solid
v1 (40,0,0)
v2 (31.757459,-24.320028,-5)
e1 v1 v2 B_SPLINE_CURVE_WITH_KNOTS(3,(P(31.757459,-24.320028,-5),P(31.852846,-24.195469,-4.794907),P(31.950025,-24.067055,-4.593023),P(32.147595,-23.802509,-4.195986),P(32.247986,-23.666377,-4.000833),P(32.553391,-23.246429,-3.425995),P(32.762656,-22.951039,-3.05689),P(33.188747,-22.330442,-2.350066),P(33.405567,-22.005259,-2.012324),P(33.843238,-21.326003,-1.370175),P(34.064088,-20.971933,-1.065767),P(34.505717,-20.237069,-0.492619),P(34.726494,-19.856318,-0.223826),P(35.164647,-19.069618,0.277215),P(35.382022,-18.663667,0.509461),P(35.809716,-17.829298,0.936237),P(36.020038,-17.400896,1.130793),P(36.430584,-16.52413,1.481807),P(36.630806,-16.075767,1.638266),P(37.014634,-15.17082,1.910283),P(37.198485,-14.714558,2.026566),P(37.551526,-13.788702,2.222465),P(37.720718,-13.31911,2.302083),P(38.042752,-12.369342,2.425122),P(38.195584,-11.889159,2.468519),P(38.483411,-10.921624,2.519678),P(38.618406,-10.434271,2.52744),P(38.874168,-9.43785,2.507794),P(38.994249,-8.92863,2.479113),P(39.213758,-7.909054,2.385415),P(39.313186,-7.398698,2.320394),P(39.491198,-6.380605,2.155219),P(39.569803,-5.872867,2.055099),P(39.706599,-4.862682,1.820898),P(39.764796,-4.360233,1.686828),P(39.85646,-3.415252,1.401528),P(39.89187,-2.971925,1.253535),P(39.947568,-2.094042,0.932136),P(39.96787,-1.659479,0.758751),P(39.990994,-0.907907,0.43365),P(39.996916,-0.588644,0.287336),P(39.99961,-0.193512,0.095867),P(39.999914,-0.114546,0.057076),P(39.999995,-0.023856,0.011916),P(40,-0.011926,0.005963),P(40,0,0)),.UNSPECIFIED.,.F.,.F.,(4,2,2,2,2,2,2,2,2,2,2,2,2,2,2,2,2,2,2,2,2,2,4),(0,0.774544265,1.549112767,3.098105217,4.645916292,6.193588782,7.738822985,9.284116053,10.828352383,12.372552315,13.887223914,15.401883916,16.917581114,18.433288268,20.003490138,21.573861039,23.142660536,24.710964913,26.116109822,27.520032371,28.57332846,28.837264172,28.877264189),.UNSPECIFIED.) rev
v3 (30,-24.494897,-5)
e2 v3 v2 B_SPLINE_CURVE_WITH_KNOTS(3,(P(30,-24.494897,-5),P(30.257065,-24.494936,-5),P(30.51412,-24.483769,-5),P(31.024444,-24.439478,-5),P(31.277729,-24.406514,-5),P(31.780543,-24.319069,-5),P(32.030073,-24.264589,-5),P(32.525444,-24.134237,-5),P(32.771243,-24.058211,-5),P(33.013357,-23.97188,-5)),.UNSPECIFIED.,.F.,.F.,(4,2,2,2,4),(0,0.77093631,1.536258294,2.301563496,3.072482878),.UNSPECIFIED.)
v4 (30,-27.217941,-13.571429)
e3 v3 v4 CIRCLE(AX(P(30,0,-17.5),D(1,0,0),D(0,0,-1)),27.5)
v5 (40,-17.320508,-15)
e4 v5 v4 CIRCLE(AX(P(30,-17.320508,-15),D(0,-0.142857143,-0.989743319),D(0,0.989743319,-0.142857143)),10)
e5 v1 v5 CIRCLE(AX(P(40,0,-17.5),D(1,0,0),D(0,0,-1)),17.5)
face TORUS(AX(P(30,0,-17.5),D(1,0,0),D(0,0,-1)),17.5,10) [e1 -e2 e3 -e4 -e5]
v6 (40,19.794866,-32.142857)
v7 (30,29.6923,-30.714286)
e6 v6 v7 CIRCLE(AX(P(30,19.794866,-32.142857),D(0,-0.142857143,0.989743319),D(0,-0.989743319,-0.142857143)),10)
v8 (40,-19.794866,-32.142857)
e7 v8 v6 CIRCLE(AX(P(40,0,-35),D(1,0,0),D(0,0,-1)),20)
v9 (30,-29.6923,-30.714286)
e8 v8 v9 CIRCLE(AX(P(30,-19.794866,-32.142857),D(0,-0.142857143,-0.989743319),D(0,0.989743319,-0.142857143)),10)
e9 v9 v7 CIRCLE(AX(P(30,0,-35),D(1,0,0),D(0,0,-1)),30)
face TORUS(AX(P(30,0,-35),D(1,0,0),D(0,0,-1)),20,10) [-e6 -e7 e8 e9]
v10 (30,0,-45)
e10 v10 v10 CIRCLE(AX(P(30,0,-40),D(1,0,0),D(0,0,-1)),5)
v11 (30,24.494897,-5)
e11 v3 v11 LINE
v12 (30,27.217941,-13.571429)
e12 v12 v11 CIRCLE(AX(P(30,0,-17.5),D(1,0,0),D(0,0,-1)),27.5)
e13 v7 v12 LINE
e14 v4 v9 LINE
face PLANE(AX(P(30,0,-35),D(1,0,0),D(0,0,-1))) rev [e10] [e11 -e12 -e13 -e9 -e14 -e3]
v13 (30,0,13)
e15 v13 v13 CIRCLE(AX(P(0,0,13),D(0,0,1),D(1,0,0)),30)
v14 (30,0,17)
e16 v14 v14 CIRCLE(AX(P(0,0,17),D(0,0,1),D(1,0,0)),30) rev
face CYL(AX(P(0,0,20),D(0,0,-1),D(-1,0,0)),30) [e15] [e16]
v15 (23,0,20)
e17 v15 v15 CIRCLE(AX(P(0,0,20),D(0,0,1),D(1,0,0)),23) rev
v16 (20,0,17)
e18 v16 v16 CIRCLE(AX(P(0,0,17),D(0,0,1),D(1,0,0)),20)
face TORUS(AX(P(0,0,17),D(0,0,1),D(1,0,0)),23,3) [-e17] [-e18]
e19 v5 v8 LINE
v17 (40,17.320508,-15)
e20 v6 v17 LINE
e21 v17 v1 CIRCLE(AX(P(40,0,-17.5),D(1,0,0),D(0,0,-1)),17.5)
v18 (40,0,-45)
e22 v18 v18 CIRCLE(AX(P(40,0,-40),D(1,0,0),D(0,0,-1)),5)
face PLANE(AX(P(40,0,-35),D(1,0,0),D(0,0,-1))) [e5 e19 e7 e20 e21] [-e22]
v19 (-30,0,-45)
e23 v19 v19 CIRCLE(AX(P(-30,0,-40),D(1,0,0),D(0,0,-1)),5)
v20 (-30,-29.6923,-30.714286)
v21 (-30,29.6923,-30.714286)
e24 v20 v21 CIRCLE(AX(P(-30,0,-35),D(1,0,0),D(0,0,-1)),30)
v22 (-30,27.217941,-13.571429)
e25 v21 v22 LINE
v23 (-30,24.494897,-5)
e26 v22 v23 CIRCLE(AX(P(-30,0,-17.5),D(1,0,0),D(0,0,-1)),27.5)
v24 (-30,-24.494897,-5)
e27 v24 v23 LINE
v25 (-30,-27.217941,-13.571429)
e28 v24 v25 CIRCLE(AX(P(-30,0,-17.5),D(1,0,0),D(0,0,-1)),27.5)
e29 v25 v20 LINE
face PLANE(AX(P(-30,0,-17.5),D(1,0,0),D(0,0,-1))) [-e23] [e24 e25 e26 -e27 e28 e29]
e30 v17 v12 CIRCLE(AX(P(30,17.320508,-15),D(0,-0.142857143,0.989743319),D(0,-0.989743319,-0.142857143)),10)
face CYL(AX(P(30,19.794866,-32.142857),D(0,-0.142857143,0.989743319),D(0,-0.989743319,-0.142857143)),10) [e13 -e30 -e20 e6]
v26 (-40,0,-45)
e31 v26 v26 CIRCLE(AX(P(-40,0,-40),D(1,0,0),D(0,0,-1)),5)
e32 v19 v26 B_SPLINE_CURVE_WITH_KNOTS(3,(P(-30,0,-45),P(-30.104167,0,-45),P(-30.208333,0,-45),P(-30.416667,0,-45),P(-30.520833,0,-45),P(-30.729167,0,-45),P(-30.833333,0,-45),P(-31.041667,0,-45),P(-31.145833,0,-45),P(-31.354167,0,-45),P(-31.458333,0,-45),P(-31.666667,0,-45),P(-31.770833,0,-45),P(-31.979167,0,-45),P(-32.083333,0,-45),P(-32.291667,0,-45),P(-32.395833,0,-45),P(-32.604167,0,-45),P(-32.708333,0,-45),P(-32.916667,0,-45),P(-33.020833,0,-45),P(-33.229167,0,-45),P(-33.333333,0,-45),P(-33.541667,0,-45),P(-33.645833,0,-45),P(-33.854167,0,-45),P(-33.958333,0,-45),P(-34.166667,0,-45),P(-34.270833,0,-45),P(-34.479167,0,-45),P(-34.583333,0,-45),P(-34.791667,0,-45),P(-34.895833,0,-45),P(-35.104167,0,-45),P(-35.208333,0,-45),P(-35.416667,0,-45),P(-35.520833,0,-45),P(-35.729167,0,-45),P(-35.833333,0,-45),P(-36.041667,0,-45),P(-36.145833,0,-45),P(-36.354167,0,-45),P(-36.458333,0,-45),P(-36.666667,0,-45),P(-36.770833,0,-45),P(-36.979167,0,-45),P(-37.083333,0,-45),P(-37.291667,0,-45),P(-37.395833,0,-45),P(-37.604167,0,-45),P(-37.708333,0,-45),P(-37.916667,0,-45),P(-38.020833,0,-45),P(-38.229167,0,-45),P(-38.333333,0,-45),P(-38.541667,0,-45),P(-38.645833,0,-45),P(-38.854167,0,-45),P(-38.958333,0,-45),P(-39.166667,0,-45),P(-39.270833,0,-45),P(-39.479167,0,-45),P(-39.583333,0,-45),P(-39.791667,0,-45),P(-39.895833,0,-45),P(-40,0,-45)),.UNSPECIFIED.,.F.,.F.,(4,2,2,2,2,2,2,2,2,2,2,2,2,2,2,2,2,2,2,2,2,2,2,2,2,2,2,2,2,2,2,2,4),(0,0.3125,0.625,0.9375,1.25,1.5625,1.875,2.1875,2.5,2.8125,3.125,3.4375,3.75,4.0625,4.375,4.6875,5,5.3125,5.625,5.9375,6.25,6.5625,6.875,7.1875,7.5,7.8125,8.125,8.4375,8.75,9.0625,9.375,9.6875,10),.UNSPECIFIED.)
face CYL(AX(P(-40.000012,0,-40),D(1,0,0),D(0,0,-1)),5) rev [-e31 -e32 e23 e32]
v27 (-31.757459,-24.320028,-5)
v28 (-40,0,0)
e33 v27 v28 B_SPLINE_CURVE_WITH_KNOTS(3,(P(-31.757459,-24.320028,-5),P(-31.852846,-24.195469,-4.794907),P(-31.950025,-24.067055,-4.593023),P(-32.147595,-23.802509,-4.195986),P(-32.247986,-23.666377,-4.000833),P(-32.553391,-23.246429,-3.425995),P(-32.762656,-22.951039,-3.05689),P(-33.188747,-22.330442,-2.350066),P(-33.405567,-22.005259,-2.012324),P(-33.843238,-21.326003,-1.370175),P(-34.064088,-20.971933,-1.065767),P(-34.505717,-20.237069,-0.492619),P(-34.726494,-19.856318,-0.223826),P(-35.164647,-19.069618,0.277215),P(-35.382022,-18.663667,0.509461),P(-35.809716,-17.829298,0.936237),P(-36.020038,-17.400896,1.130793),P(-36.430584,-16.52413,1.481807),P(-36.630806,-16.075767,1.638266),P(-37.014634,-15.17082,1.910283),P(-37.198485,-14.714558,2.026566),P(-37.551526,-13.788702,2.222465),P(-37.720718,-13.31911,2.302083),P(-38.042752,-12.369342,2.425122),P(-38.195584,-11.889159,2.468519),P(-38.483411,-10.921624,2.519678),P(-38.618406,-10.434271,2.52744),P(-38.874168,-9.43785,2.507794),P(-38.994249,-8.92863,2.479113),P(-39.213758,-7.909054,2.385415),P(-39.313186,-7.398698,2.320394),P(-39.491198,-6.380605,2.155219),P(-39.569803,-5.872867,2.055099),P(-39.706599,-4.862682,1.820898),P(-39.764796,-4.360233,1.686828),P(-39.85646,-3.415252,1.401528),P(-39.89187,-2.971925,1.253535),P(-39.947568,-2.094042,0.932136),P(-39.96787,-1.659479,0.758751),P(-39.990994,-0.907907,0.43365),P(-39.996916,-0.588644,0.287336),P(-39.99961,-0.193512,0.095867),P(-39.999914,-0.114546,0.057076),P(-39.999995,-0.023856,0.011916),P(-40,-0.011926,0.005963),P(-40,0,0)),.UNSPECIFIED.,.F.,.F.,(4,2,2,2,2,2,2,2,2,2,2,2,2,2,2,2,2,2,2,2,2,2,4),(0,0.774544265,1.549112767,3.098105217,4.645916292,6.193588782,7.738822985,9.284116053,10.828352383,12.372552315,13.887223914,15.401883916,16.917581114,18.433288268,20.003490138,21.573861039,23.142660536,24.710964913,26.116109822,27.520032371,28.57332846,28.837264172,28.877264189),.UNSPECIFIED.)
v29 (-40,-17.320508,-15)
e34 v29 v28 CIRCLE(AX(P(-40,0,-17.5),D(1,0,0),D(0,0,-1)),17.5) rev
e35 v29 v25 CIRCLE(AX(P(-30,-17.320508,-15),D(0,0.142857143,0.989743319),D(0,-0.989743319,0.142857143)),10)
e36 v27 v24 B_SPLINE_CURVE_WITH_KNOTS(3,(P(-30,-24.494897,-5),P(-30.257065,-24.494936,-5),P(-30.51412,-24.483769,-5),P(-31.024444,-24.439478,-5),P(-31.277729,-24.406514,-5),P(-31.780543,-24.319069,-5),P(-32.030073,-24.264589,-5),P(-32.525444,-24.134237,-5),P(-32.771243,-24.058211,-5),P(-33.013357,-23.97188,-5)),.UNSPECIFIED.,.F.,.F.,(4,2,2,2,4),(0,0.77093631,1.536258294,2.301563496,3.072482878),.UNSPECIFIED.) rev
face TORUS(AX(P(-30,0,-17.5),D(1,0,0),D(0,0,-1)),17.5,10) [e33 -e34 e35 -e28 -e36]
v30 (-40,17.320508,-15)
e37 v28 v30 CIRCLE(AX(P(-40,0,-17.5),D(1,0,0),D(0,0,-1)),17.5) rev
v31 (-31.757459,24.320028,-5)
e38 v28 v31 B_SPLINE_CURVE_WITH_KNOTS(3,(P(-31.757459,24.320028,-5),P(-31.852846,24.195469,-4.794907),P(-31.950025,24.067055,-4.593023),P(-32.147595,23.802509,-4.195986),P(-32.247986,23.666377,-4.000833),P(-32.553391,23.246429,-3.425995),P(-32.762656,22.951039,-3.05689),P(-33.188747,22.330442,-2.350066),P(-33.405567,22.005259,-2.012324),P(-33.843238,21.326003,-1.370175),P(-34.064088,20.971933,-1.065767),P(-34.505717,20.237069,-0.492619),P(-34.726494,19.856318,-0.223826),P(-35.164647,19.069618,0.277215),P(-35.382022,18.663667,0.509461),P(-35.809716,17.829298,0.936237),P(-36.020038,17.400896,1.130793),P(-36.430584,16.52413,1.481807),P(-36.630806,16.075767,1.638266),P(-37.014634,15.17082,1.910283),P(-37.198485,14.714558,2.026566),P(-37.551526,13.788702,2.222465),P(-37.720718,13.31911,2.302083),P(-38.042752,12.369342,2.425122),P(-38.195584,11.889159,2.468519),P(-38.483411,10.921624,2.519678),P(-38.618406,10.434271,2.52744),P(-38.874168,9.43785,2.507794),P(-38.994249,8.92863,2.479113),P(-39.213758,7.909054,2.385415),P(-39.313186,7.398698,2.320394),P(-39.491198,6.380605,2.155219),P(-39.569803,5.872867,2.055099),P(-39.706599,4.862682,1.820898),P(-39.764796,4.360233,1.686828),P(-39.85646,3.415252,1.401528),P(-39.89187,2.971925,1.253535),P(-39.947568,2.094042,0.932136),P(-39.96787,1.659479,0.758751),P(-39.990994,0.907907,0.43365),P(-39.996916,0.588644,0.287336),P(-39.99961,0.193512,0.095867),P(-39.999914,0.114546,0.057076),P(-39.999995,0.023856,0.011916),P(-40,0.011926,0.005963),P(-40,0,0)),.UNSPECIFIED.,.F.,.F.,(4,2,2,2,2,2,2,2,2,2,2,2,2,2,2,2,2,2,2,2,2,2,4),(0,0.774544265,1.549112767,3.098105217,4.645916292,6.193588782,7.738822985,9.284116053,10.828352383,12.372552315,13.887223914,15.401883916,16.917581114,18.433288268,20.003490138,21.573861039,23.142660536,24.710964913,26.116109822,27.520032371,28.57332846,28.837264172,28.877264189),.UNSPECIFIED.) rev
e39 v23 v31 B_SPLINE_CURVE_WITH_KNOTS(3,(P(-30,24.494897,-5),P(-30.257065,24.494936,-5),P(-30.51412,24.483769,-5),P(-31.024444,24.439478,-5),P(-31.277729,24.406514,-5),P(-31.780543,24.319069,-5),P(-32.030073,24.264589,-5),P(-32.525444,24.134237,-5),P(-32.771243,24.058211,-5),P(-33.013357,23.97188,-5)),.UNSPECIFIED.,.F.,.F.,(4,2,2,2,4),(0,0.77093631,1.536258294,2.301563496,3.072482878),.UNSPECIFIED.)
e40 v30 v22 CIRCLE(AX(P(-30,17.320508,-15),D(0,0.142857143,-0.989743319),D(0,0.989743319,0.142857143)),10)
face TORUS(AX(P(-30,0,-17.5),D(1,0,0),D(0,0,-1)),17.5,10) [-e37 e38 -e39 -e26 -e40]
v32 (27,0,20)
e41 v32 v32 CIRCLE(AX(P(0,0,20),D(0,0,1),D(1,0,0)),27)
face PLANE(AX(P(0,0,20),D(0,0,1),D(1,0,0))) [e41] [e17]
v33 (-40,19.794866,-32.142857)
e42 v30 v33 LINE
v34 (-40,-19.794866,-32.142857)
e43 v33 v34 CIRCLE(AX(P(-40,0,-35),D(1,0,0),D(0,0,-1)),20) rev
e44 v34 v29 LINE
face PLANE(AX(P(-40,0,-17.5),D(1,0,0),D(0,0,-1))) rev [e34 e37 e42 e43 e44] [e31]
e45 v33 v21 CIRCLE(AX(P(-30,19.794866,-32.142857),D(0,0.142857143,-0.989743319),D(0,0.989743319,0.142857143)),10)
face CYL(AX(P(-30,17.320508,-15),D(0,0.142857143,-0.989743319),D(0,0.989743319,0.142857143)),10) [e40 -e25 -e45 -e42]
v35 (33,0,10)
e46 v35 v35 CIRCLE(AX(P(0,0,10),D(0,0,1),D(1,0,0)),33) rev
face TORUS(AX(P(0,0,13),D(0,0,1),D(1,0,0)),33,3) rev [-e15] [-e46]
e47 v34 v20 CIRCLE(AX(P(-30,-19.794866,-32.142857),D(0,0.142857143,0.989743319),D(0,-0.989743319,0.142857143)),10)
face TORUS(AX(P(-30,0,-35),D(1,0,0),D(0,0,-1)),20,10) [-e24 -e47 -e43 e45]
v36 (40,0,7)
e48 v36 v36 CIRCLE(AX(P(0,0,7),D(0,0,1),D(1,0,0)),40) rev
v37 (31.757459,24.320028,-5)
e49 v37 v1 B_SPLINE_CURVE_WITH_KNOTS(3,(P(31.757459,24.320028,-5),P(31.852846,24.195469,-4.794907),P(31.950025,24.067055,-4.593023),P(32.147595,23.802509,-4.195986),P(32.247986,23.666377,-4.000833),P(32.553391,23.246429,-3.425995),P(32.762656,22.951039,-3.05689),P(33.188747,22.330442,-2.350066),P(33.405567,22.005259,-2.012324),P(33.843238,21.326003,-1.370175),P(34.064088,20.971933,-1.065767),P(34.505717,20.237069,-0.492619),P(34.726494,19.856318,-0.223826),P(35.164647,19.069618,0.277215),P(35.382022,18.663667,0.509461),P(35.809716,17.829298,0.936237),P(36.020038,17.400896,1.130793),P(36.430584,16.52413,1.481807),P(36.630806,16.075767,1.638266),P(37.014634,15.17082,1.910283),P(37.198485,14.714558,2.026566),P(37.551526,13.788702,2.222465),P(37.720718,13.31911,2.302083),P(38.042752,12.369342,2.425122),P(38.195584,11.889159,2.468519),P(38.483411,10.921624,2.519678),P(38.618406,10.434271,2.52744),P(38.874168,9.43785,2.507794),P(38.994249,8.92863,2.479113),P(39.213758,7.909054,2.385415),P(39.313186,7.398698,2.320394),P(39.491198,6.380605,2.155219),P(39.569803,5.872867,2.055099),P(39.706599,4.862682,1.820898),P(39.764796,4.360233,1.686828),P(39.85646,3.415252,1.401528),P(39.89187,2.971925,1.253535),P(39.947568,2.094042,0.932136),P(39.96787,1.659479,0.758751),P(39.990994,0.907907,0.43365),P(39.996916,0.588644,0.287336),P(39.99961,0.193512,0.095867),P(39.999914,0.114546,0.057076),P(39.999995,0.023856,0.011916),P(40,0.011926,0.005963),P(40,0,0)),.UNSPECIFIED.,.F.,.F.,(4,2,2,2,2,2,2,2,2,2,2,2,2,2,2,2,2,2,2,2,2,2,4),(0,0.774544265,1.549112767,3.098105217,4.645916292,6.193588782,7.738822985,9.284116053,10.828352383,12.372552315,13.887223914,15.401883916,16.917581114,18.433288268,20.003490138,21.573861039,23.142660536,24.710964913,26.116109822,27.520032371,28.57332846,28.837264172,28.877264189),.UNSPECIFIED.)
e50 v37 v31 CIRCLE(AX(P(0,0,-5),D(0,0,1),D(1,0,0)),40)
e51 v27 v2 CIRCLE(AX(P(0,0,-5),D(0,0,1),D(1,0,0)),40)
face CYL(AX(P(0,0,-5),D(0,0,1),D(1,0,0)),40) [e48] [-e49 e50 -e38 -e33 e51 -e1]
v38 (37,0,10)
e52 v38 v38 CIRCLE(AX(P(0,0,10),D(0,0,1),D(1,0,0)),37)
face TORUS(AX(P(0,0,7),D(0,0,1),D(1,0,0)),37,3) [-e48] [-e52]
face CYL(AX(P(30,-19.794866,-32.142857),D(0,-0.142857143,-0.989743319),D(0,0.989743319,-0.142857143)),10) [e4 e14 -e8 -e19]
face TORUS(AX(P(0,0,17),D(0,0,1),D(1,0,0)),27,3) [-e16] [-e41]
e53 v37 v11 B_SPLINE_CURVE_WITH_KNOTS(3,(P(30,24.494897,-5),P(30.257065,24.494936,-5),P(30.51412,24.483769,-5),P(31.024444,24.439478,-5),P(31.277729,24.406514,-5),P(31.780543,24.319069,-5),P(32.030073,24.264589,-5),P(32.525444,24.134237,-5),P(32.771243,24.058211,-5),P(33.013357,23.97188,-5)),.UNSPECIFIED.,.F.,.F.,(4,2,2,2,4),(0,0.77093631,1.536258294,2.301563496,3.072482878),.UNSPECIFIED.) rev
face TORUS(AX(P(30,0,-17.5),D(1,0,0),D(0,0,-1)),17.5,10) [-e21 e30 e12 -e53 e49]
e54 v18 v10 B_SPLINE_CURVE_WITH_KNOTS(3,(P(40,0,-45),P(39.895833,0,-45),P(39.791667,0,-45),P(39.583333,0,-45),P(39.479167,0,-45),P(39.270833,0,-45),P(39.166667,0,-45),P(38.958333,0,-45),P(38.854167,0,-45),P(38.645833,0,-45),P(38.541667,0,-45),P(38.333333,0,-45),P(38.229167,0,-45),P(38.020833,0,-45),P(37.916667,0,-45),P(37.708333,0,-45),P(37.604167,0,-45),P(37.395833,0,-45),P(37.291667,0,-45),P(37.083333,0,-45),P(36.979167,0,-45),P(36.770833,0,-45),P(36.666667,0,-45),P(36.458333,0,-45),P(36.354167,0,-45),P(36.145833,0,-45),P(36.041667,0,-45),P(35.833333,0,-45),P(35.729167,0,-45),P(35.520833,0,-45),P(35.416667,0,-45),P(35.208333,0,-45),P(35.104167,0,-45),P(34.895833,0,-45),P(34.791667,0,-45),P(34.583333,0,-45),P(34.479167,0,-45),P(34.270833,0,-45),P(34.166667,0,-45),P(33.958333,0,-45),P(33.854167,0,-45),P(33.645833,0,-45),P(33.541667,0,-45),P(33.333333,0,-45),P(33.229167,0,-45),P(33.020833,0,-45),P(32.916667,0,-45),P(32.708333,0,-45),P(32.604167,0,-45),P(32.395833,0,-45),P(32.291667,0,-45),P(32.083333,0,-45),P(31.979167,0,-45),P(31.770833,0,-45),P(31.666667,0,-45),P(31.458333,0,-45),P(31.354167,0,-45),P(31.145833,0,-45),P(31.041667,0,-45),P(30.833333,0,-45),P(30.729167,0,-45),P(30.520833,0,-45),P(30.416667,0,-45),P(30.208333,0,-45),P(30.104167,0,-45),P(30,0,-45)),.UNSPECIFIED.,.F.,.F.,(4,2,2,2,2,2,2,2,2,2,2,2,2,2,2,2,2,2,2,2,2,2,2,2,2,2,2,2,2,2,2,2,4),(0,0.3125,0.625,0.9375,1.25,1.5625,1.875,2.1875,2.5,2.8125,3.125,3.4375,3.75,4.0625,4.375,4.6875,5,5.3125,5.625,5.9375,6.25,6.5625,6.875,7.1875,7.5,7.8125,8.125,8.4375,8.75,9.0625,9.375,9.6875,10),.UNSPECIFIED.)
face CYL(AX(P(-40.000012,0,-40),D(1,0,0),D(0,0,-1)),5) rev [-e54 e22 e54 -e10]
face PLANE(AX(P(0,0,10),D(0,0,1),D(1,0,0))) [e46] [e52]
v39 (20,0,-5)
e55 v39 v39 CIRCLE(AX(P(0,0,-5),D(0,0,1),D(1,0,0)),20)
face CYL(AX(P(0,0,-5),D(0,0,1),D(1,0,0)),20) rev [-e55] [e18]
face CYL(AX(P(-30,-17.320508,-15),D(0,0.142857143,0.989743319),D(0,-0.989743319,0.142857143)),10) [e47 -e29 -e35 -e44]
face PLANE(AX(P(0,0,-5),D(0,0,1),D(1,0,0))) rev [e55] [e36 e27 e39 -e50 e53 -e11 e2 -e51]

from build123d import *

# Parameters (mm, degrees)
EXTRUDE_1_DEPTH          = 10
EXTRUDE_1_DEPTH_BACK     = 5
SKETCH_1_R               = 40
SKETCH_2_R               = 30
EXTRUDE_2_DEPTH          = 10
SKETCH_3_R               = 20
CUT_EXTRUDE_1_DEPTH      = 62.846584384
EXTRUDE_3_DEPTH          = 10
EXTRUDE_START            = 10
EXTRUDE_4_DEPTH          = 10
CUT_EXTRUDE_2_DEPTH      = 111.566722046
CUT_EXTRUDE_2_DEPTH_BACK = 111.566722046
SKETCH_8_R               = 5
FILLET_1_R               = 10
FILLET_2_R               = 10
FILLET_3_R               = 3
FILLET_4_R               = 3


with BuildPart() as part:
    # 스케치1 → 보스-돌출1 (new, two sides: drawn at the far end of the back side and taken through both)
    with BuildSketch(Plane.XY.offset(-EXTRUDE_1_DEPTH_BACK)):
        Circle(SKETCH_1_R)
    extrude(amount=EXTRUDE_1_DEPTH + EXTRUDE_1_DEPTH_BACK)

    # 스케치2 → 보스-돌출2 (add)
    with BuildSketch(Plane.XY.offset(10)):
        Circle(SKETCH_2_R)
    extrude(amount=EXTRUDE_2_DEPTH)

    # 스케치3 → 컷-돌출1 (cut, through all)
    with BuildSketch(Plane.XY.offset(20)):
        Circle(SKETCH_3_R)
    extrude(amount=-CUT_EXTRUDE_1_DEPTH, mode=Mode.SUBTRACT)

    # 스케치6 → 보스-돌출3 (add)
    with BuildSketch(Plane(origin=(40, 0, 0), x_dir=(0, 0, -1), z_dir=(1, 0, 0))):
        with BuildLine():
            Line((13.571428571, 27.217941262), (30.714285714, 29.692299558))
            ThreePointArc((30.714285714, 29.692299558), (65, 0), (30.714285714, -29.692299558))
            Line((30.714285714, -29.692299558), (13.571428571, -27.217941262))
            ThreePointArc((13.571428571, -27.217941262), (-10, 0), (13.571428571, 27.217941262))
        make_face()
    extrude(amount=-EXTRUDE_3_DEPTH)

    # 스케치7 → 보스-돌출4 (add)
    with BuildSketch(Plane(origin=(-40, 0, 0), x_dir=(0, 0, -1), z_dir=(1, 0, 0)).offset(EXTRUDE_START)):
        with BuildLine():
            Line((30.714285714, 29.692299558), (13.571428571, 27.217941262))
            ThreePointArc((13.571428571, 27.217941262), (-10, 0), (13.571428571, -27.217941262))
            Line((13.571428571, -27.217941262), (30.714285714, -29.692299558))
            ThreePointArc((30.714285714, -29.692299558), (65, 0), (30.714285714, 29.692299558))
        make_face()
    extrude(amount=-EXTRUDE_4_DEPTH)

    # 스케치8 → 컷-돌출2 (cut, two sides: drawn at the far end of the back side and taken through both)
    with BuildSketch(Plane(origin=(-40, 0, 0), x_dir=(0, 0, -1), z_dir=(1, 0, 0)).offset(-CUT_EXTRUDE_2_DEPTH_BACK)):
        with Locations((40, 0)):
            Circle(SKETCH_8_R)
    extrude(amount=CUT_EXTRUDE_2_DEPTH + CUT_EXTRUDE_2_DEPTH_BACK, mode=Mode.SUBTRACT)

    # 필렛1
    # the kernel refuses this fillet: 10 mm, written as the material it takes off along each edge
    with BuildSketch(Plane(origin=(40, 0, -35), x_dir=(0, 0.989743318610787, 0.14285714285714288), z_dir=(0, -0.14285714285714288, 0.989743318610787))) as fillet_1_piece_1:
        with BuildLine():
            CenterArc((30 - FILLET_1_R, FILLET_1_R), FILLET_1_R, 270, 90)
            Line((30, FILLET_1_R), (30, 0))
            Line((30, 0), (30 - FILLET_1_R, 0))
        make_face()
    revolve(axis=Axis((40, 0, -35), (-1, 0, 0)), revolution_arc=196.426421403, mode=Mode.SUBTRACT)
    with BuildSketch(Plane(origin=(40, 27.217941262, -13.571428571), x_dir=(0, -0.9897433186107871, -0.1428571428571427), z_dir=(0, 0.1428571428571427, -0.9897433186107871)), Plane(origin=(40, -29.692299558, -30.714285714), x_dir=(0, 0.9897433186107871, -0.1428571428571427), z_dir=(0, 0.1428571428571427, 0.9897433186107871))) as fillet_1_piece_2:
        with BuildLine():
            CenterArc((FILLET_1_R, FILLET_1_R), FILLET_1_R, 180, 90)
            Line((0, FILLET_1_R), (0, 0))
            Line((0, 0), (FILLET_1_R, 0))
        make_face()
    extrude(amount=17.320508076, mode=Mode.SUBTRACT)
    with BuildSketch(Plane(origin=(40, 0, -17.5), x_dir=(0, -0.9897433186107871, 0.14285714285714243), z_dir=(0, -0.14285714285714243, -0.9897433186107871))) as fillet_1_piece_3_section:
        with BuildLine():
            CenterArc((27.5 - FILLET_1_R, FILLET_1_R), FILLET_1_R, 270, 90)
            Line((27.5 - FILLET_1_R, 0), (27.5, 0))
            Line((27.5, 0), (27.5, FILLET_1_R))
        make_face()
    fillet_1_piece_3 = revolve(axis=Axis((40, 0, -17.5), (-1, 0, 0)), revolution_arc=81.786789298, mode=Mode.PRIVATE)
    fillet_1_piece_3 = split(fillet_1_piece_3, bisect_by=Plane(origin=(37.813701487, -23.668076626, -5), z_dir=(0, 0, -1)), keep=Keep.TOP, mode=Mode.PRIVATE)
    add(fillet_1_piece_3, mode=Mode.SUBTRACT)
    with BuildSketch(Plane(origin=(40, 0, -17.5), x_dir=(0, -0.9897433186107871, 0.14285714285714243), z_dir=(0, -0.14285714285714243, -0.9897433186107871))) as fillet_1_piece_4_section:
        with BuildLine():
            CenterArc((27.5 - FILLET_1_R, FILLET_1_R), FILLET_1_R, 270, 90)
            Line((27.5 - FILLET_1_R, 0), (27.5, 0))
            Line((27.5, 0), (27.5, FILLET_1_R))
        make_face()
    fillet_1_piece_4 = revolve(axis=Axis((40, 0, -17.5), (-1, 0, 0)), revolution_arc=81.786789298, mode=Mode.PRIVATE)
    fillet_1_piece_4 = fillet_1_piece_4 - Plane(origin=(0, 0, 0.682031715), x_dir=(1, 0, 0), z_dir=(0, 0, -1)) * Cylinder(40, 110, mode=Mode.PRIVATE)
    add(fillet_1_piece_4, mode=Mode.SUBTRACT)
    with BuildSketch(Plane(origin=(40, 0, -17.5), x_dir=(0, 0, 1), z_dir=(0, -1, 0))) as fillet_1_piece_5_section:
        with BuildLine():
            CenterArc((27.5 - FILLET_1_R, FILLET_1_R), FILLET_1_R, 270, 90)
            Line((27.5, FILLET_1_R), (27.5, 0))
            Line((27.5, 0), (27.5 - FILLET_1_R, 0))
        make_face()
    fillet_1_piece_5 = revolve(axis=Axis((40, 0, -17.5), (-1, 0, 0)), revolution_arc=81.786789298, mode=Mode.PRIVATE)
    fillet_1_piece_5 = fillet_1_piece_5 - Plane(origin=(0, 0, 0.682032438), x_dir=(1, 0, 0), z_dir=(0, 0, -1)) * Cylinder(40, 111, mode=Mode.PRIVATE)
    add(fillet_1_piece_5, mode=Mode.SUBTRACT)
    with BuildSketch(Plane(origin=(40, 0, -17.5), x_dir=(0, 0, 1), z_dir=(0, -1, 0))) as fillet_1_piece_6_section:
        with BuildLine():
            CenterArc((27.5 - FILLET_1_R, FILLET_1_R), FILLET_1_R, 270, 90)
            Line((27.5, FILLET_1_R), (27.5, 0))
            Line((27.5, 0), (27.5 - FILLET_1_R, 0))
        make_face()
    fillet_1_piece_6 = revolve(axis=Axis((40, 0, -17.5), (-1, 0, 0)), revolution_arc=81.786789298, mode=Mode.PRIVATE)
    fillet_1_piece_6 = split(fillet_1_piece_6, bisect_by=Plane(origin=(31.001684961, 24.879661093, -5), z_dir=(0, 0, -1)), keep=Keep.TOP, mode=Mode.PRIVATE)
    add(fillet_1_piece_6, mode=Mode.SUBTRACT)

    # 필렛2
    # the kernel refuses this fillet: 10 mm, written as the material it takes off along each edge
    with BuildSketch(Plane(origin=(-40, 0, -17.5), x_dir=(0, -2.2670264695792934e-09, 1.0), z_dir=(0, 1.0, 2.2670264695792934e-09))) as fillet_2_piece_1_section:
        with BuildLine():
            CenterArc((27.5 - FILLET_2_R, FILLET_2_R), FILLET_2_R, 270, 90)
            Line((27.5 - FILLET_2_R, 0), (27.5, 0))
            Line((27.5, 0), (27.5, FILLET_2_R))
        make_face()
    fillet_2_piece_1 = revolve(axis=Axis((-40, 0, -17.5), (1, 0, 0)), revolution_arc=81.786789168, mode=Mode.PRIVATE)
    fillet_2_piece_1 = fillet_2_piece_1 - Plane(origin=(0, 0, 0.682033406), x_dir=(1, 0, 0), z_dir=(0, 0, -1)) * Cylinder(40, 111, mode=Mode.PRIVATE)
    add(fillet_2_piece_1, mode=Mode.SUBTRACT)
    with BuildSketch(Plane(origin=(-40, 0, -17.5), x_dir=(0, -2.2670264695792934e-09, 1.0), z_dir=(0, 1.0, 2.2670264695792934e-09))) as fillet_2_piece_2_section:
        with BuildLine():
            CenterArc((27.5 - FILLET_2_R, FILLET_2_R), FILLET_2_R, 270, 90)
            Line((27.5 - FILLET_2_R, 0), (27.5, 0))
            Line((27.5, 0), (27.5, FILLET_2_R))
        make_face()
    fillet_2_piece_2 = revolve(axis=Axis((-40, 0, -17.5), (1, 0, 0)), revolution_arc=81.786789168, mode=Mode.PRIVATE)
    fillet_2_piece_2 = split(fillet_2_piece_2, bisect_by=Plane(origin=(-31.001684959, -24.879661102, -5), z_dir=(0, 0, -1)), keep=Keep.TOP, mode=Mode.PRIVATE)
    add(fillet_2_piece_2, mode=Mode.SUBTRACT)
    with BuildSketch(Plane(origin=(-40, -27.217941262, -13.571428571), x_dir=(1, 0, 0), z_dir=(0, -0.1428571428571422, -0.9897433186107871)), Plane(origin=(-40, 29.692299558, -30.714285714), x_dir=(1, 0, 0), z_dir=(0, -0.1428571428571422, 0.9897433186107871))) as fillet_2_piece_3:
        with BuildLine():
            CenterArc((FILLET_2_R, -FILLET_2_R), FILLET_2_R, 90, 90)
            Line((0, -FILLET_2_R), (0, 0))
            Line((0, 0), (FILLET_2_R, 0))
        make_face()
    extrude(amount=17.320508076, mode=Mode.SUBTRACT)
    with BuildSketch(Plane(origin=(-40, 0, -35), x_dir=(0, -0.9897433186107871, 0.14285714285714157), z_dir=(0, 0.14285714285714157, 0.9897433186107871))) as fillet_2_piece_4:
        with BuildLine():
            CenterArc((30 - FILLET_2_R, FILLET_2_R), FILLET_2_R, 270, 90)
            Line((30 - FILLET_2_R, 0), (30, 0))
            Line((30, 0), (30, FILLET_2_R))
        make_face()
    revolve(axis=Axis((-40, 0, -35), (1, 0, 0)), revolution_arc=196.426421403, mode=Mode.SUBTRACT)
    with BuildSketch(Plane(origin=(-40, 0, -17.5), x_dir=(0, 0.9897433186107871, 0.14285714285714218), z_dir=(0, 0.14285714285714218, -0.9897433186107871))) as fillet_2_piece_5_section:
        with BuildLine():
            CenterArc((27.5 - FILLET_2_R, FILLET_2_R), FILLET_2_R, 270, 90)
            Line((27.5 - FILLET_2_R, 0), (27.5, 0))
            Line((27.5, 0), (27.5, FILLET_2_R))
        make_face()
    fillet_2_piece_5 = revolve(axis=Axis((-40, 0, -17.5), (1, 0, 0)), revolution_arc=81.786789428, mode=Mode.PRIVATE)
    fillet_2_piece_5 = split(fillet_2_piece_5, bisect_by=Plane(origin=(-37.813701921, 23.668076798, -5), z_dir=(0, 0, -1)), keep=Keep.TOP, mode=Mode.PRIVATE)
    add(fillet_2_piece_5, mode=Mode.SUBTRACT)
    with BuildSketch(Plane(origin=(-40, 0, -17.5), x_dir=(0, 0.9897433186107871, 0.14285714285714218), z_dir=(0, 0.14285714285714218, -0.9897433186107871))) as fillet_2_piece_6_section:
        with BuildLine():
            CenterArc((27.5 - FILLET_2_R, FILLET_2_R), FILLET_2_R, 270, 90)
            Line((27.5 - FILLET_2_R, 0), (27.5, 0))
            Line((27.5, 0), (27.5, FILLET_2_R))
        make_face()
    fillet_2_piece_6 = revolve(axis=Axis((-40, 0, -17.5), (1, 0, 0)), revolution_arc=81.786789428, mode=Mode.PRIVATE)
    fillet_2_piece_6 = fillet_2_piece_6 - Plane(origin=(0, 0, 0.682032284), x_dir=(1, 0, 0), z_dir=(0, 0, -1)) * Cylinder(40, 111, mode=Mode.PRIVATE)
    add(fillet_2_piece_6, mode=Mode.SUBTRACT)

    # 필렛3
    # the kernel refuses this fillet: 3 mm, written as the material it adds along each edge
    with BuildSketch(Plane(origin=(0, 0, 10), x_dir=(1, 0, 0), z_dir=(0, 1, 0))) as fillet_3_piece_1:
        with BuildLine():
            CenterArc((30 + FILLET_3_R, -FILLET_3_R), FILLET_3_R, 90, 90)
            Line((30, -FILLET_3_R), (30, 0))
            Line((30, 0), (30 + FILLET_3_R, 0))
        make_face()
    revolve(axis=Axis((0, 0, 10), (0, 0, -1)))
    # the kernel refuses this fillet: 3 mm, written as the material it takes off along each edge
    with BuildSketch(Plane(origin=(0, 0, 10), x_dir=(-1.0, -1.558580697495618e-09, 0), z_dir=(-1.558580697495618e-09, 1.0, 0))) as fillet_3_2_piece_1:
        with BuildLine():
            CenterArc((40 - FILLET_3_R, -FILLET_3_R), FILLET_3_R, 0, 90)
            Line((40 - FILLET_3_R, 0), (40, 0))
            Line((40, 0), (40, -FILLET_3_R))
        make_face()
    revolve(axis=Axis((0, 0, 10), (0, 0, 1)), revolution_arc=179.999999911, mode=Mode.SUBTRACT)
    with BuildSketch(Plane(origin=(0, 0, 10), x_dir=(1, 0, 0), z_dir=(0, -1, 0))) as fillet_3_2_piece_2:
        with BuildLine():
            CenterArc((40 - FILLET_3_R, -FILLET_3_R), FILLET_3_R, 0, 90)
            Line((40, -FILLET_3_R), (40, 0))
            Line((40, 0), (40 - FILLET_3_R, 0))
        make_face()
    revolve(axis=Axis((0, 0, 10), (0, 0, 1)), revolution_arc=180.000000089, mode=Mode.SUBTRACT)

    # 필렛4
    fillet_4_edges = [part.edges().sort_by_distance(p)[0] for p in [
        (-20, 0, 20),
        (-30, 0, 20),
    ]]
    fillet(fillet_4_edges, radius=FILLET_4_R)


solid = part.part
